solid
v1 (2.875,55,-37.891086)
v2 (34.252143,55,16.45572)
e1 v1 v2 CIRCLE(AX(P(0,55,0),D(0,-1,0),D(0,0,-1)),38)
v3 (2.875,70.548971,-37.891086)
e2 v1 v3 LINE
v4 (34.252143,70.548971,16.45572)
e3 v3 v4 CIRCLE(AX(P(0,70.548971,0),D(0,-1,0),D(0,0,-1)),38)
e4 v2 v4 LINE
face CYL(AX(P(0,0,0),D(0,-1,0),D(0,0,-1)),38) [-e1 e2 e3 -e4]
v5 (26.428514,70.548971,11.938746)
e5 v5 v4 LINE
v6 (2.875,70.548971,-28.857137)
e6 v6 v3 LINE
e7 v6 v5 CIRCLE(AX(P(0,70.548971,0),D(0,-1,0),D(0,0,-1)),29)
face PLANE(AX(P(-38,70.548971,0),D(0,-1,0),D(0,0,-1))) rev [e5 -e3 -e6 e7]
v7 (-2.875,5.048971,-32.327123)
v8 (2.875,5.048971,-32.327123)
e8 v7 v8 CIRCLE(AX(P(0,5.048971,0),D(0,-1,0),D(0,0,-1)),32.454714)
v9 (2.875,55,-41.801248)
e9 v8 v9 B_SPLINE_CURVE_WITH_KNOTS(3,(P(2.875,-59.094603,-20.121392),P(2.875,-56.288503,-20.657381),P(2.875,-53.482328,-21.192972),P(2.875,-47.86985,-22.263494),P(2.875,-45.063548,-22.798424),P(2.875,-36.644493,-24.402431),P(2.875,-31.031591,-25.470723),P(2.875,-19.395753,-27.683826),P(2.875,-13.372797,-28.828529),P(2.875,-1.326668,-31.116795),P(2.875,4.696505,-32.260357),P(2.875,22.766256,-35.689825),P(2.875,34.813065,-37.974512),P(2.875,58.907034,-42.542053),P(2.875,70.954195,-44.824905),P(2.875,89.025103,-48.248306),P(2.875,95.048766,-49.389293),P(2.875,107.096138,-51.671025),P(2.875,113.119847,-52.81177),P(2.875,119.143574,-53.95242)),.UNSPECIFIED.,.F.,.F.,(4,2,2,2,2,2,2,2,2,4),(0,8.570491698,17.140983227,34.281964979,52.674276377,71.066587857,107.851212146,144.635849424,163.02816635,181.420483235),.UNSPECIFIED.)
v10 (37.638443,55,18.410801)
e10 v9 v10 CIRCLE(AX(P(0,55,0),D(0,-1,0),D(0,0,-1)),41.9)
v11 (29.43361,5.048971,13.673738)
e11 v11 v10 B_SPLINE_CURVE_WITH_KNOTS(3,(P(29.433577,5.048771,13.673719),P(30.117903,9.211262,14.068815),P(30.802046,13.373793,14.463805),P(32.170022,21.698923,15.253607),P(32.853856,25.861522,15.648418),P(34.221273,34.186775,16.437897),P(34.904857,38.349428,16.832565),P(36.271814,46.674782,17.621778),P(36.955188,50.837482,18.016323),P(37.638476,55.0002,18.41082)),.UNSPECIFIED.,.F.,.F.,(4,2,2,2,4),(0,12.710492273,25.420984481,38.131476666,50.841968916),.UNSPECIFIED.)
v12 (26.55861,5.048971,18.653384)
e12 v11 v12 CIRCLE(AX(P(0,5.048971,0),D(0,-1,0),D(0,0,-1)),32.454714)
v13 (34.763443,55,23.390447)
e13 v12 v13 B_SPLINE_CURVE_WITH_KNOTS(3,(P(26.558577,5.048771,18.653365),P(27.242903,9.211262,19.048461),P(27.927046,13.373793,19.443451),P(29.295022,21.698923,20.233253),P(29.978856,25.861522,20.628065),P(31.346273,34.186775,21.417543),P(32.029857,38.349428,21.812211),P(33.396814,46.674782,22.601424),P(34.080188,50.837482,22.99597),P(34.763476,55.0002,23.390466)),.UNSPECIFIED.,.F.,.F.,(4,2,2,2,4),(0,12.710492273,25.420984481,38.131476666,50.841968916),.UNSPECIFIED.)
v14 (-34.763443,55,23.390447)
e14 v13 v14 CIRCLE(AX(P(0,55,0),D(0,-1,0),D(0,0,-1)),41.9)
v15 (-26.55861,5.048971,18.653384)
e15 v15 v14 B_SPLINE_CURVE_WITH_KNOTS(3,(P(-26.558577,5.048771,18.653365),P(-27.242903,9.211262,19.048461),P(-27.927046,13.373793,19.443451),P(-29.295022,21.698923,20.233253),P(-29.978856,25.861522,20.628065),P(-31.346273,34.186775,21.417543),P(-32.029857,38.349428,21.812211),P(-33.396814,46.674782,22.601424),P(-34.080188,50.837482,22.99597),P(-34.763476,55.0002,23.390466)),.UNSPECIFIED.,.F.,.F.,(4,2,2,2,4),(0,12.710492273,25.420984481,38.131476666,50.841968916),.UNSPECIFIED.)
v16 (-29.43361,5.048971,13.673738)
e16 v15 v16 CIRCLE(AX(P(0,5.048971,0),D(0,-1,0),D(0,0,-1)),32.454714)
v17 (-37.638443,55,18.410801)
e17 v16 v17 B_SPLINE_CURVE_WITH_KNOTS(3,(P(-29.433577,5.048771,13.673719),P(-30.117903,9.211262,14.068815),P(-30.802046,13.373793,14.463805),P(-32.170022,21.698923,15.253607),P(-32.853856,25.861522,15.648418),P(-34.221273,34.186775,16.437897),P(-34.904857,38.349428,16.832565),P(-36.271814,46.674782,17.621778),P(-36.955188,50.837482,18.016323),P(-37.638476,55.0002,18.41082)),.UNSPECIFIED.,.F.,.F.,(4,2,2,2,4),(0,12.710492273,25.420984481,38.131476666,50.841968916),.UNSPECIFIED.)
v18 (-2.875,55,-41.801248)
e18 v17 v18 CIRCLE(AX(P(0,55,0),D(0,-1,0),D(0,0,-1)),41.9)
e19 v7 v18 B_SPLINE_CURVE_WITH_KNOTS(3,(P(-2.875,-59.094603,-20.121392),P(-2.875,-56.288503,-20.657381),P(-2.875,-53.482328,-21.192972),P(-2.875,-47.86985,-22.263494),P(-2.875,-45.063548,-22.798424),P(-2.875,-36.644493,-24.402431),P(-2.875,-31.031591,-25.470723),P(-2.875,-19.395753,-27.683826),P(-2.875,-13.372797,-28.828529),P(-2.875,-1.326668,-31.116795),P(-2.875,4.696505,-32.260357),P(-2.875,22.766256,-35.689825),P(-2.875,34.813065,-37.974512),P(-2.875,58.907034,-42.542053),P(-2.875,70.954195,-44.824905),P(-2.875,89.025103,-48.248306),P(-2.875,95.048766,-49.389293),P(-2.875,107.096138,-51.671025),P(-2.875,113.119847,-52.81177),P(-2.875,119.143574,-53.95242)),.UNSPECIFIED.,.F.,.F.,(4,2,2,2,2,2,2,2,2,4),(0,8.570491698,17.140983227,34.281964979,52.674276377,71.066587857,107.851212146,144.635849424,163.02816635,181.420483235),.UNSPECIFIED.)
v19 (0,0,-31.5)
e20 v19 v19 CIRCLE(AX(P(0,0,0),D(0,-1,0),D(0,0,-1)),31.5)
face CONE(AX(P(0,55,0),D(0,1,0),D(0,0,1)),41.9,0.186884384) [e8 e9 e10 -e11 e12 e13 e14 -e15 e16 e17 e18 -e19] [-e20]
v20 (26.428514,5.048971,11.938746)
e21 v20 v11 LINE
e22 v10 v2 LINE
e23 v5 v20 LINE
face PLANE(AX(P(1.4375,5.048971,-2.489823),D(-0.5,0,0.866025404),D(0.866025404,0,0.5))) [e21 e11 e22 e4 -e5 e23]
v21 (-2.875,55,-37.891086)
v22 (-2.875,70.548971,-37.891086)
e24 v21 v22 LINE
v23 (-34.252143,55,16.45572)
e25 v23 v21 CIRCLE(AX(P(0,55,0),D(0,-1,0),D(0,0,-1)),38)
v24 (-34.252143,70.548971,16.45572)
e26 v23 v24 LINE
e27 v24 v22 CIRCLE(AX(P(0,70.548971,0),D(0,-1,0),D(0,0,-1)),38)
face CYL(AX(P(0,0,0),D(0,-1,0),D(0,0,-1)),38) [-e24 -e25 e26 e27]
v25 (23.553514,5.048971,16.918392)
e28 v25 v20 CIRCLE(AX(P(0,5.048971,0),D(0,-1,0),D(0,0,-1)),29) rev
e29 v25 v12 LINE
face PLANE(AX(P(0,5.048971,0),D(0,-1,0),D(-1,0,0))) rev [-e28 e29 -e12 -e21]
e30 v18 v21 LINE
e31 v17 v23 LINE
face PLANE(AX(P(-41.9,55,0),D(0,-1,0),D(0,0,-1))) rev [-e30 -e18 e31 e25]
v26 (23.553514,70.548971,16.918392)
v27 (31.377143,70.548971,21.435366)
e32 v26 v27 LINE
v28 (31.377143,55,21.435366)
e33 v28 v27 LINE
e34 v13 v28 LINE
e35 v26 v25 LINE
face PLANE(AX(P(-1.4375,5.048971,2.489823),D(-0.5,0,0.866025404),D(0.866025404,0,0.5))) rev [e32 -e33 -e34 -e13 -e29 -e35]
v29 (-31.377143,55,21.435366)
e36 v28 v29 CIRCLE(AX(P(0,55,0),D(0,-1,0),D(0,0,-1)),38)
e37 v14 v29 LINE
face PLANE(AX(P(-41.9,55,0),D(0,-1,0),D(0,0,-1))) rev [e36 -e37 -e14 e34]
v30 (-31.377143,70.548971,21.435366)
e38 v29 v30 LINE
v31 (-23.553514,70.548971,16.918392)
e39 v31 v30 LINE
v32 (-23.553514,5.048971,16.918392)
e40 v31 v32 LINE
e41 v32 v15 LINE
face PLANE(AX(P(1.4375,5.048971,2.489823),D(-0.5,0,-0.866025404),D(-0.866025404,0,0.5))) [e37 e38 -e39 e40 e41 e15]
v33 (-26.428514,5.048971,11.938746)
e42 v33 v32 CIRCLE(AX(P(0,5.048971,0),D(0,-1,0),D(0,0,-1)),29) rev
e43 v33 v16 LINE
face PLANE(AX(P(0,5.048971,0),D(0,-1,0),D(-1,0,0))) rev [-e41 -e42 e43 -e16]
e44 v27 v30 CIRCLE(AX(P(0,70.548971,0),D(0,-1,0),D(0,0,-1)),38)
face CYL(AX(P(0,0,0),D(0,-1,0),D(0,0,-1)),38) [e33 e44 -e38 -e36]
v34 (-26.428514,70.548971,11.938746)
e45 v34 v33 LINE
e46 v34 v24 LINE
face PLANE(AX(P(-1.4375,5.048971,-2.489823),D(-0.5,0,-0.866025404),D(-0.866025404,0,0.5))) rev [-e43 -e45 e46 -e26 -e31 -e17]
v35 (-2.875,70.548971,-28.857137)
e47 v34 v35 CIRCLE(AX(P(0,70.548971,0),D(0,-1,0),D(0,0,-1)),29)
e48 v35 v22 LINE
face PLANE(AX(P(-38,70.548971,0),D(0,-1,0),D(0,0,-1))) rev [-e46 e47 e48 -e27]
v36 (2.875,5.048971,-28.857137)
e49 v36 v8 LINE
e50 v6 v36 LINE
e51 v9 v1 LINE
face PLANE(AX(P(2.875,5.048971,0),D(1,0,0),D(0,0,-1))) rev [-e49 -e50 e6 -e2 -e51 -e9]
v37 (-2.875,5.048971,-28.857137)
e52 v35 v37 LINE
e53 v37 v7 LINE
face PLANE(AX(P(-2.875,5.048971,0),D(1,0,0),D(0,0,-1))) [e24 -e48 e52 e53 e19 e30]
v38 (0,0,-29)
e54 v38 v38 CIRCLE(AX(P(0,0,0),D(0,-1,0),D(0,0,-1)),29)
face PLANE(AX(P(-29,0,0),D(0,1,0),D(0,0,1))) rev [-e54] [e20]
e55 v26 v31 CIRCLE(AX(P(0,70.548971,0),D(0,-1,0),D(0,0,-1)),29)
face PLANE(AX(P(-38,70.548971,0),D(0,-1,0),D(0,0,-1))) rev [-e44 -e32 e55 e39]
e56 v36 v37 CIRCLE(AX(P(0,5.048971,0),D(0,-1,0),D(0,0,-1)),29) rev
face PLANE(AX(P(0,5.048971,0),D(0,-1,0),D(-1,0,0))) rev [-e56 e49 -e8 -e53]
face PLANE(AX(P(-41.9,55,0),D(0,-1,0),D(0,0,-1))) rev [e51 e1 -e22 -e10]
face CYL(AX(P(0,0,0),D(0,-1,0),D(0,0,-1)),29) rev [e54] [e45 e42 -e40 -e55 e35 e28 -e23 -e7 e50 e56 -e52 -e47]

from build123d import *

# Parameters (mm, degrees)
CUT_EXTRUDE_THIN1_START = -65.5
CUT_EXTRUDE_THIN1_DEPTH = 65.5


# Read off the part's stored shape, not the designer's step: Cut-Extrude-Thin1
with BuildPart() as part:
    # Sketch3 → Revolve1 (revolve)
    with BuildSketch(Plane.XY, mode=Mode.PRIVATE) as revolve1_sk:
        Polygon((-38, 55), (-38, 70.548970685), (-29, 70.548970685), (-29, 55), (-29, 0), (-31.5, 0), (-41.9, 55), align=None)
    revolve(revolve1_sk.sketch.rotate(Axis((0, 0, 0), (0, 1, 0)), 270), axis=Axis((0, 0, 0), (0, 1, 0)))

    # Cut-Extrude-Thin1 outline → Cut-Extrude-Thin1 (cut)
    with BuildSketch(Plane(origin=(0, 70.548970685, 0), x_dir=(1, 0, 0), z_dir=(0, 1, 0)).offset(CUT_EXTRUDE_THIN1_START)):
        Polygon((2.875, 4.979646072), (2.875, 43), (-2.875, 43), (-2.875, 4.979646072), (0, 3.319764048), align=None)
        Polygon((5.75, 0), (2.875, -1.659882024), (2.875, -4.979646072), (23.55351401, -16.918391702), (34.763443099, -23.390447279), (37.551270189, -25), (39, -25), (39, -19.19689645), (37.638443099, -18.410801207), (26.42851401, -11.93874563), align=None)
        Polygon((-2.875, -4.979646072), (-2.875, -1.659882024), (-5.75, 0), (-26.42851401, -11.93874563), (-37.638443099, -18.410801207), (-39, -19.19689645), (-39, -25), (-37.551270189, -25), (-34.763443099, -23.390447279), (-23.55351401, -16.918391702), align=None)
    extrude(amount=CUT_EXTRUDE_THIN1_DEPTH, mode=Mode.SUBTRACT)


solid = part.part
